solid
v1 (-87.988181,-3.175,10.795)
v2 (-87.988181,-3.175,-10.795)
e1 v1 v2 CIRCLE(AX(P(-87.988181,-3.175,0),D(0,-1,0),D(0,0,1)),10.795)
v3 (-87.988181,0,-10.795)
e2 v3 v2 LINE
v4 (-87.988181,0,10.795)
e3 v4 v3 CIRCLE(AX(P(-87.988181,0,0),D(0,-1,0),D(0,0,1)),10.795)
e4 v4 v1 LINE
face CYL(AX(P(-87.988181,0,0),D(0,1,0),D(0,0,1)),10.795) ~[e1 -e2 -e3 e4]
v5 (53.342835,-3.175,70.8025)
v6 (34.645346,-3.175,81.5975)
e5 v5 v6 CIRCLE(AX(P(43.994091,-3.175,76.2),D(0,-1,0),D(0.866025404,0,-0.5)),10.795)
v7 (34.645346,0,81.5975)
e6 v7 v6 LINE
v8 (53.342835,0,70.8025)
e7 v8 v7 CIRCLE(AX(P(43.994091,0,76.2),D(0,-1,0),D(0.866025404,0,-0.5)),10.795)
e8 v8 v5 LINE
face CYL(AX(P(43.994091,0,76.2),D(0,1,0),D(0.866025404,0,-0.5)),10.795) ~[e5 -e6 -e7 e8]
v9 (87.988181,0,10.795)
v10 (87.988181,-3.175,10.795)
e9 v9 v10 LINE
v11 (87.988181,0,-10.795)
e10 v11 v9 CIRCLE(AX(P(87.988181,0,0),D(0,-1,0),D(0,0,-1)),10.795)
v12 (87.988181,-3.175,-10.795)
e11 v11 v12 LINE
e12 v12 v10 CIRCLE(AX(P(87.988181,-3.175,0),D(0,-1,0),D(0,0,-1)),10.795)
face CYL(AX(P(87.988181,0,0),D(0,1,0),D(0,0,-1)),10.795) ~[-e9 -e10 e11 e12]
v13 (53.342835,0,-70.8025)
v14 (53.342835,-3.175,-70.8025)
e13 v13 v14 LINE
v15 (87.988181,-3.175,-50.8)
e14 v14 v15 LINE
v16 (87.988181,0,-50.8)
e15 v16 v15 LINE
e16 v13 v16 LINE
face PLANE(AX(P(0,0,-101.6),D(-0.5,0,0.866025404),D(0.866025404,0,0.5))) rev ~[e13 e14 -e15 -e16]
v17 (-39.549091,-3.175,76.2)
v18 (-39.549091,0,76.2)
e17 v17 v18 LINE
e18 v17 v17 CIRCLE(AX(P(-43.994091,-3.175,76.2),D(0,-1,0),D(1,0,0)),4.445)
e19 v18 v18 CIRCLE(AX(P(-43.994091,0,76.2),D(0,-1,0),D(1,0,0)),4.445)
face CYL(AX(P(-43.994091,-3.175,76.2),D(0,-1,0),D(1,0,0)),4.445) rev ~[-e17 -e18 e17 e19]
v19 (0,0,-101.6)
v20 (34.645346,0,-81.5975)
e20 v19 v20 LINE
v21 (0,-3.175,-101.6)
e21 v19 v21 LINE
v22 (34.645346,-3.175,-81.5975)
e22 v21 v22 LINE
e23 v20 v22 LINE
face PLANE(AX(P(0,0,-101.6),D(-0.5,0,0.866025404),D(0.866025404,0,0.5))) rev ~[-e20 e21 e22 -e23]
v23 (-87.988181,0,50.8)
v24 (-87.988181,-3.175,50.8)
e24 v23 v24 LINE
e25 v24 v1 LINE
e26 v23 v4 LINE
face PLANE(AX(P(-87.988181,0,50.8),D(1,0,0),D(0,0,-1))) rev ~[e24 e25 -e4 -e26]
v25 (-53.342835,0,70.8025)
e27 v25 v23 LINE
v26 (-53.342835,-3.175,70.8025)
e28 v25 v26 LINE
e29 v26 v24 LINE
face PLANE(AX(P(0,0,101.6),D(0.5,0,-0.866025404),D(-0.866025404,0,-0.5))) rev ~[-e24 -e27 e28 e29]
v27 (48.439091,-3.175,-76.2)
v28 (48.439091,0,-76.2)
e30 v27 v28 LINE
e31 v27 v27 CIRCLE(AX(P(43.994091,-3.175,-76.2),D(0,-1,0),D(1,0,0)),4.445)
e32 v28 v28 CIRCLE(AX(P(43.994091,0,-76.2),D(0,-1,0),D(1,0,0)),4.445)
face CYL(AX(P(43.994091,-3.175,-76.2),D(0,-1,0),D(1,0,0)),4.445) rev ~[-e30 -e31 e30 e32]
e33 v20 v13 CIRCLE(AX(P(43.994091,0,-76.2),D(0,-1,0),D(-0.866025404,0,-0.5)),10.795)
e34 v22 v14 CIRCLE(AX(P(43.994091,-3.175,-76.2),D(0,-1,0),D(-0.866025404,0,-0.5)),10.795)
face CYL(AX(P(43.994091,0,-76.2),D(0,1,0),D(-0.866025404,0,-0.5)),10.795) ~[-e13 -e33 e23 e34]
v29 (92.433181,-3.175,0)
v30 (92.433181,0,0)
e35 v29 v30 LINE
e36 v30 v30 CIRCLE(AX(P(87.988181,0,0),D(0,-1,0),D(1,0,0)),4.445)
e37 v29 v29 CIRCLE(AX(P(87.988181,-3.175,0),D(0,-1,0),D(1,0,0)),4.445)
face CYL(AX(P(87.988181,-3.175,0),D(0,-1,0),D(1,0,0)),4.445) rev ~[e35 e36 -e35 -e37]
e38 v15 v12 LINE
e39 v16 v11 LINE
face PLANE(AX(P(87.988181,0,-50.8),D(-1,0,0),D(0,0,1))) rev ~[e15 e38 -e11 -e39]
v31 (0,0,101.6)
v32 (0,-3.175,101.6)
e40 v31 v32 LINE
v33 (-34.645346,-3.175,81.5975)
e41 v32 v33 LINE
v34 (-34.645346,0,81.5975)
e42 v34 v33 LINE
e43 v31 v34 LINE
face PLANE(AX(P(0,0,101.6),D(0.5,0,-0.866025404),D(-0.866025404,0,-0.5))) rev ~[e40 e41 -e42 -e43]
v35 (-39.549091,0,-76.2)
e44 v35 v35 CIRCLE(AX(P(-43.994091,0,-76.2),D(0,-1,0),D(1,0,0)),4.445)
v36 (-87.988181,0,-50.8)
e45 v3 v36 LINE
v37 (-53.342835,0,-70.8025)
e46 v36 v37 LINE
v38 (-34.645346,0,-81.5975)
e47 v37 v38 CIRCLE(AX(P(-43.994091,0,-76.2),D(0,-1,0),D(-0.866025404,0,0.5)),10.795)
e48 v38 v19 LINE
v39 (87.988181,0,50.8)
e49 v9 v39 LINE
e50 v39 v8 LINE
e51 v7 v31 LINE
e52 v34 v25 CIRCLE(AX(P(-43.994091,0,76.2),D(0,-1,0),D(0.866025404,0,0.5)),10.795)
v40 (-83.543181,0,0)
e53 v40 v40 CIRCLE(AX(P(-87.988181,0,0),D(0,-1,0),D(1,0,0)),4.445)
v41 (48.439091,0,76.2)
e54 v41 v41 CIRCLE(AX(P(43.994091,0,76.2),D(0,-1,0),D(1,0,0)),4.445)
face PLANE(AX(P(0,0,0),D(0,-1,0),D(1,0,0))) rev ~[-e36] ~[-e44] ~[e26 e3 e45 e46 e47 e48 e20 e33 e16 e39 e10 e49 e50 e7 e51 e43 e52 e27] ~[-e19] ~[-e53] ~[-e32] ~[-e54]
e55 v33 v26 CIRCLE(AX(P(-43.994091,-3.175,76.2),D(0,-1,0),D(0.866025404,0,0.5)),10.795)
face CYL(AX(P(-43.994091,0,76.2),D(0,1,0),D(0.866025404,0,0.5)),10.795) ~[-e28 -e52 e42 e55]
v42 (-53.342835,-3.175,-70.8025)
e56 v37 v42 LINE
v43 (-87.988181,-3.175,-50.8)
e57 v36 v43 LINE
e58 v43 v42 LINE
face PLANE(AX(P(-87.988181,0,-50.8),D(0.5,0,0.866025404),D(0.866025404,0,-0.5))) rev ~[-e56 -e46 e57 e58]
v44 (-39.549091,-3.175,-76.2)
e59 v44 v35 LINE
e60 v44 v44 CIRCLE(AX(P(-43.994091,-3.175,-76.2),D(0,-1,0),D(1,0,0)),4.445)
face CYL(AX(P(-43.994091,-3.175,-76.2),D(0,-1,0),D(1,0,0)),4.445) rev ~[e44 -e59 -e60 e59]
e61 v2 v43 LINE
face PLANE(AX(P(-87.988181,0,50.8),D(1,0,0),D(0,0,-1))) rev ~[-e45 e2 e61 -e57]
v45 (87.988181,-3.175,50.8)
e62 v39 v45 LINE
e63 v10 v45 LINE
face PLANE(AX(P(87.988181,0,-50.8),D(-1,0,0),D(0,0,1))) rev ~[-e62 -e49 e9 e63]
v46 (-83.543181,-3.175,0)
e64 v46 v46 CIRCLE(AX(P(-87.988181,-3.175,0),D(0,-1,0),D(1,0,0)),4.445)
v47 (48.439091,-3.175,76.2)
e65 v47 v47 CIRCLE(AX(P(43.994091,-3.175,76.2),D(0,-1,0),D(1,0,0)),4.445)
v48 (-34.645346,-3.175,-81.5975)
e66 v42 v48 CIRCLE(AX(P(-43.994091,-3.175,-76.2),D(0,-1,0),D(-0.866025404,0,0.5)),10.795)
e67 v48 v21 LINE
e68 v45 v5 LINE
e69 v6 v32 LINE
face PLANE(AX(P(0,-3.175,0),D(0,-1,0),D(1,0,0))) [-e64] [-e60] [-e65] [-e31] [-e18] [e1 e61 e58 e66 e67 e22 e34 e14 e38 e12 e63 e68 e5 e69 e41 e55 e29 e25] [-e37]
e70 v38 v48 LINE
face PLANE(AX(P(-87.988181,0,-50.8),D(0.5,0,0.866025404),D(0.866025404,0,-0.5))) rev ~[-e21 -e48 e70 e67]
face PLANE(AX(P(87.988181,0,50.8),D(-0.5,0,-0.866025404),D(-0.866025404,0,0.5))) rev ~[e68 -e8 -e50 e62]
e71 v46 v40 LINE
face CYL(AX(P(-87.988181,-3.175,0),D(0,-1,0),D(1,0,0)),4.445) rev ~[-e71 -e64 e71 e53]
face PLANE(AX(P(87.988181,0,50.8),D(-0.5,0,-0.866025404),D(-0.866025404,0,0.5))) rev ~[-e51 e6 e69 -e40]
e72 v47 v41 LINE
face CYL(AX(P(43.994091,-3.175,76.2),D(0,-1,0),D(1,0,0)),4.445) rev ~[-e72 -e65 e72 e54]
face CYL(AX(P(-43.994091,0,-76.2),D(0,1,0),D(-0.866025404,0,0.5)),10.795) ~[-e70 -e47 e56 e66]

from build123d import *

# Parameters (mm, degrees)
F1_DEPTH = 3.175
F4_DEPTH = 3.175
F5_R     = 4.445
F6_DEPTH = 3.176


# Not quite as in the source:
# - a length typed as a fraction of an inch, garbled in the dataset ("3 / 203.2 mm" for 3/8 in), is restored


with BuildPart() as f1:
    # F0 (on Front) → F1 (new body)
    with BuildSketch(Plane.XZ):
        Polygon((87.9881810245, 50.8), (0, 101.6), (-87.9881810245, 50.8), (-87.9881810245, -50.8), (0, -101.6), (87.9881810245, -50.8), align=None)
    extrude(amount=F1_DEPTH)

    # F3 (on Front) → F4 (join)
    with BuildSketch(Plane.XZ):
        with BuildLine():
            ThreePointArc((87.9881810245, -10.795), (98.7831810245, 0), (87.9881810245, 10.795))
            Line((87.9881810245, 10.795), (87.9881810245, -10.795))
        make_face()
        with BuildLine():
            Line((34.6453462784, 81.5975), (53.3428347461, 70.8025))
            ThreePointArc((53.3428347461, 70.8025), (49.3915905122, 85.5487442339), (34.6453462784, 81.5975))
        make_face()
        with BuildLine():
            Line((-53.3428347461, 70.8025), (-34.6453462784, 81.5975))
            ThreePointArc((-34.6453462784, 81.5975), (-49.3915905122, 85.5487442339), (-53.3428347461, 70.8025))
        make_face()
        with BuildLine():
            Line((-87.9881810245, -10.795), (-87.9881810245, 10.795))
            ThreePointArc((-87.9881810245, 10.795), (-98.7831810245, 0), (-87.9881810245, -10.795))
        make_face()
        with BuildLine():
            Line((-34.6453462784, -81.5975), (-53.3428347461, -70.8025))
            ThreePointArc((-53.3428347461, -70.8025), (-49.3915905122, -85.5487442339), (-34.6453462784, -81.5975))
        make_face()
        with BuildLine():
            Line((53.3428347461, -70.8025), (34.6453462784, -81.5975))
            ThreePointArc((34.6453462784, -81.5975), (49.3915905122, -85.5487442339), (53.3428347461, -70.8025))
        make_face()
    extrude(amount=F4_DEPTH)

    # F5 (on face) → F6 (cut, through all)
    with BuildSketch(Plane.XZ.offset(3.175)):
        with Locations((43.9940905122, 76.2)):
            Circle(F5_R)
        with Locations((-43.9940905122, 76.2)):
            Circle(F5_R)
        with Locations((-87.9881810245, 0)):
            Circle(F5_R)
        with Locations((-43.9940905122, -76.2)):
            Circle(F5_R)
        with Locations((43.9940905122, -76.2)):
            Circle(F5_R)
        with Locations((87.9881810245, 0)):
            Circle(F5_R)
    extrude(amount=-F6_DEPTH, mode=Mode.SUBTRACT)


solid = f1.part
